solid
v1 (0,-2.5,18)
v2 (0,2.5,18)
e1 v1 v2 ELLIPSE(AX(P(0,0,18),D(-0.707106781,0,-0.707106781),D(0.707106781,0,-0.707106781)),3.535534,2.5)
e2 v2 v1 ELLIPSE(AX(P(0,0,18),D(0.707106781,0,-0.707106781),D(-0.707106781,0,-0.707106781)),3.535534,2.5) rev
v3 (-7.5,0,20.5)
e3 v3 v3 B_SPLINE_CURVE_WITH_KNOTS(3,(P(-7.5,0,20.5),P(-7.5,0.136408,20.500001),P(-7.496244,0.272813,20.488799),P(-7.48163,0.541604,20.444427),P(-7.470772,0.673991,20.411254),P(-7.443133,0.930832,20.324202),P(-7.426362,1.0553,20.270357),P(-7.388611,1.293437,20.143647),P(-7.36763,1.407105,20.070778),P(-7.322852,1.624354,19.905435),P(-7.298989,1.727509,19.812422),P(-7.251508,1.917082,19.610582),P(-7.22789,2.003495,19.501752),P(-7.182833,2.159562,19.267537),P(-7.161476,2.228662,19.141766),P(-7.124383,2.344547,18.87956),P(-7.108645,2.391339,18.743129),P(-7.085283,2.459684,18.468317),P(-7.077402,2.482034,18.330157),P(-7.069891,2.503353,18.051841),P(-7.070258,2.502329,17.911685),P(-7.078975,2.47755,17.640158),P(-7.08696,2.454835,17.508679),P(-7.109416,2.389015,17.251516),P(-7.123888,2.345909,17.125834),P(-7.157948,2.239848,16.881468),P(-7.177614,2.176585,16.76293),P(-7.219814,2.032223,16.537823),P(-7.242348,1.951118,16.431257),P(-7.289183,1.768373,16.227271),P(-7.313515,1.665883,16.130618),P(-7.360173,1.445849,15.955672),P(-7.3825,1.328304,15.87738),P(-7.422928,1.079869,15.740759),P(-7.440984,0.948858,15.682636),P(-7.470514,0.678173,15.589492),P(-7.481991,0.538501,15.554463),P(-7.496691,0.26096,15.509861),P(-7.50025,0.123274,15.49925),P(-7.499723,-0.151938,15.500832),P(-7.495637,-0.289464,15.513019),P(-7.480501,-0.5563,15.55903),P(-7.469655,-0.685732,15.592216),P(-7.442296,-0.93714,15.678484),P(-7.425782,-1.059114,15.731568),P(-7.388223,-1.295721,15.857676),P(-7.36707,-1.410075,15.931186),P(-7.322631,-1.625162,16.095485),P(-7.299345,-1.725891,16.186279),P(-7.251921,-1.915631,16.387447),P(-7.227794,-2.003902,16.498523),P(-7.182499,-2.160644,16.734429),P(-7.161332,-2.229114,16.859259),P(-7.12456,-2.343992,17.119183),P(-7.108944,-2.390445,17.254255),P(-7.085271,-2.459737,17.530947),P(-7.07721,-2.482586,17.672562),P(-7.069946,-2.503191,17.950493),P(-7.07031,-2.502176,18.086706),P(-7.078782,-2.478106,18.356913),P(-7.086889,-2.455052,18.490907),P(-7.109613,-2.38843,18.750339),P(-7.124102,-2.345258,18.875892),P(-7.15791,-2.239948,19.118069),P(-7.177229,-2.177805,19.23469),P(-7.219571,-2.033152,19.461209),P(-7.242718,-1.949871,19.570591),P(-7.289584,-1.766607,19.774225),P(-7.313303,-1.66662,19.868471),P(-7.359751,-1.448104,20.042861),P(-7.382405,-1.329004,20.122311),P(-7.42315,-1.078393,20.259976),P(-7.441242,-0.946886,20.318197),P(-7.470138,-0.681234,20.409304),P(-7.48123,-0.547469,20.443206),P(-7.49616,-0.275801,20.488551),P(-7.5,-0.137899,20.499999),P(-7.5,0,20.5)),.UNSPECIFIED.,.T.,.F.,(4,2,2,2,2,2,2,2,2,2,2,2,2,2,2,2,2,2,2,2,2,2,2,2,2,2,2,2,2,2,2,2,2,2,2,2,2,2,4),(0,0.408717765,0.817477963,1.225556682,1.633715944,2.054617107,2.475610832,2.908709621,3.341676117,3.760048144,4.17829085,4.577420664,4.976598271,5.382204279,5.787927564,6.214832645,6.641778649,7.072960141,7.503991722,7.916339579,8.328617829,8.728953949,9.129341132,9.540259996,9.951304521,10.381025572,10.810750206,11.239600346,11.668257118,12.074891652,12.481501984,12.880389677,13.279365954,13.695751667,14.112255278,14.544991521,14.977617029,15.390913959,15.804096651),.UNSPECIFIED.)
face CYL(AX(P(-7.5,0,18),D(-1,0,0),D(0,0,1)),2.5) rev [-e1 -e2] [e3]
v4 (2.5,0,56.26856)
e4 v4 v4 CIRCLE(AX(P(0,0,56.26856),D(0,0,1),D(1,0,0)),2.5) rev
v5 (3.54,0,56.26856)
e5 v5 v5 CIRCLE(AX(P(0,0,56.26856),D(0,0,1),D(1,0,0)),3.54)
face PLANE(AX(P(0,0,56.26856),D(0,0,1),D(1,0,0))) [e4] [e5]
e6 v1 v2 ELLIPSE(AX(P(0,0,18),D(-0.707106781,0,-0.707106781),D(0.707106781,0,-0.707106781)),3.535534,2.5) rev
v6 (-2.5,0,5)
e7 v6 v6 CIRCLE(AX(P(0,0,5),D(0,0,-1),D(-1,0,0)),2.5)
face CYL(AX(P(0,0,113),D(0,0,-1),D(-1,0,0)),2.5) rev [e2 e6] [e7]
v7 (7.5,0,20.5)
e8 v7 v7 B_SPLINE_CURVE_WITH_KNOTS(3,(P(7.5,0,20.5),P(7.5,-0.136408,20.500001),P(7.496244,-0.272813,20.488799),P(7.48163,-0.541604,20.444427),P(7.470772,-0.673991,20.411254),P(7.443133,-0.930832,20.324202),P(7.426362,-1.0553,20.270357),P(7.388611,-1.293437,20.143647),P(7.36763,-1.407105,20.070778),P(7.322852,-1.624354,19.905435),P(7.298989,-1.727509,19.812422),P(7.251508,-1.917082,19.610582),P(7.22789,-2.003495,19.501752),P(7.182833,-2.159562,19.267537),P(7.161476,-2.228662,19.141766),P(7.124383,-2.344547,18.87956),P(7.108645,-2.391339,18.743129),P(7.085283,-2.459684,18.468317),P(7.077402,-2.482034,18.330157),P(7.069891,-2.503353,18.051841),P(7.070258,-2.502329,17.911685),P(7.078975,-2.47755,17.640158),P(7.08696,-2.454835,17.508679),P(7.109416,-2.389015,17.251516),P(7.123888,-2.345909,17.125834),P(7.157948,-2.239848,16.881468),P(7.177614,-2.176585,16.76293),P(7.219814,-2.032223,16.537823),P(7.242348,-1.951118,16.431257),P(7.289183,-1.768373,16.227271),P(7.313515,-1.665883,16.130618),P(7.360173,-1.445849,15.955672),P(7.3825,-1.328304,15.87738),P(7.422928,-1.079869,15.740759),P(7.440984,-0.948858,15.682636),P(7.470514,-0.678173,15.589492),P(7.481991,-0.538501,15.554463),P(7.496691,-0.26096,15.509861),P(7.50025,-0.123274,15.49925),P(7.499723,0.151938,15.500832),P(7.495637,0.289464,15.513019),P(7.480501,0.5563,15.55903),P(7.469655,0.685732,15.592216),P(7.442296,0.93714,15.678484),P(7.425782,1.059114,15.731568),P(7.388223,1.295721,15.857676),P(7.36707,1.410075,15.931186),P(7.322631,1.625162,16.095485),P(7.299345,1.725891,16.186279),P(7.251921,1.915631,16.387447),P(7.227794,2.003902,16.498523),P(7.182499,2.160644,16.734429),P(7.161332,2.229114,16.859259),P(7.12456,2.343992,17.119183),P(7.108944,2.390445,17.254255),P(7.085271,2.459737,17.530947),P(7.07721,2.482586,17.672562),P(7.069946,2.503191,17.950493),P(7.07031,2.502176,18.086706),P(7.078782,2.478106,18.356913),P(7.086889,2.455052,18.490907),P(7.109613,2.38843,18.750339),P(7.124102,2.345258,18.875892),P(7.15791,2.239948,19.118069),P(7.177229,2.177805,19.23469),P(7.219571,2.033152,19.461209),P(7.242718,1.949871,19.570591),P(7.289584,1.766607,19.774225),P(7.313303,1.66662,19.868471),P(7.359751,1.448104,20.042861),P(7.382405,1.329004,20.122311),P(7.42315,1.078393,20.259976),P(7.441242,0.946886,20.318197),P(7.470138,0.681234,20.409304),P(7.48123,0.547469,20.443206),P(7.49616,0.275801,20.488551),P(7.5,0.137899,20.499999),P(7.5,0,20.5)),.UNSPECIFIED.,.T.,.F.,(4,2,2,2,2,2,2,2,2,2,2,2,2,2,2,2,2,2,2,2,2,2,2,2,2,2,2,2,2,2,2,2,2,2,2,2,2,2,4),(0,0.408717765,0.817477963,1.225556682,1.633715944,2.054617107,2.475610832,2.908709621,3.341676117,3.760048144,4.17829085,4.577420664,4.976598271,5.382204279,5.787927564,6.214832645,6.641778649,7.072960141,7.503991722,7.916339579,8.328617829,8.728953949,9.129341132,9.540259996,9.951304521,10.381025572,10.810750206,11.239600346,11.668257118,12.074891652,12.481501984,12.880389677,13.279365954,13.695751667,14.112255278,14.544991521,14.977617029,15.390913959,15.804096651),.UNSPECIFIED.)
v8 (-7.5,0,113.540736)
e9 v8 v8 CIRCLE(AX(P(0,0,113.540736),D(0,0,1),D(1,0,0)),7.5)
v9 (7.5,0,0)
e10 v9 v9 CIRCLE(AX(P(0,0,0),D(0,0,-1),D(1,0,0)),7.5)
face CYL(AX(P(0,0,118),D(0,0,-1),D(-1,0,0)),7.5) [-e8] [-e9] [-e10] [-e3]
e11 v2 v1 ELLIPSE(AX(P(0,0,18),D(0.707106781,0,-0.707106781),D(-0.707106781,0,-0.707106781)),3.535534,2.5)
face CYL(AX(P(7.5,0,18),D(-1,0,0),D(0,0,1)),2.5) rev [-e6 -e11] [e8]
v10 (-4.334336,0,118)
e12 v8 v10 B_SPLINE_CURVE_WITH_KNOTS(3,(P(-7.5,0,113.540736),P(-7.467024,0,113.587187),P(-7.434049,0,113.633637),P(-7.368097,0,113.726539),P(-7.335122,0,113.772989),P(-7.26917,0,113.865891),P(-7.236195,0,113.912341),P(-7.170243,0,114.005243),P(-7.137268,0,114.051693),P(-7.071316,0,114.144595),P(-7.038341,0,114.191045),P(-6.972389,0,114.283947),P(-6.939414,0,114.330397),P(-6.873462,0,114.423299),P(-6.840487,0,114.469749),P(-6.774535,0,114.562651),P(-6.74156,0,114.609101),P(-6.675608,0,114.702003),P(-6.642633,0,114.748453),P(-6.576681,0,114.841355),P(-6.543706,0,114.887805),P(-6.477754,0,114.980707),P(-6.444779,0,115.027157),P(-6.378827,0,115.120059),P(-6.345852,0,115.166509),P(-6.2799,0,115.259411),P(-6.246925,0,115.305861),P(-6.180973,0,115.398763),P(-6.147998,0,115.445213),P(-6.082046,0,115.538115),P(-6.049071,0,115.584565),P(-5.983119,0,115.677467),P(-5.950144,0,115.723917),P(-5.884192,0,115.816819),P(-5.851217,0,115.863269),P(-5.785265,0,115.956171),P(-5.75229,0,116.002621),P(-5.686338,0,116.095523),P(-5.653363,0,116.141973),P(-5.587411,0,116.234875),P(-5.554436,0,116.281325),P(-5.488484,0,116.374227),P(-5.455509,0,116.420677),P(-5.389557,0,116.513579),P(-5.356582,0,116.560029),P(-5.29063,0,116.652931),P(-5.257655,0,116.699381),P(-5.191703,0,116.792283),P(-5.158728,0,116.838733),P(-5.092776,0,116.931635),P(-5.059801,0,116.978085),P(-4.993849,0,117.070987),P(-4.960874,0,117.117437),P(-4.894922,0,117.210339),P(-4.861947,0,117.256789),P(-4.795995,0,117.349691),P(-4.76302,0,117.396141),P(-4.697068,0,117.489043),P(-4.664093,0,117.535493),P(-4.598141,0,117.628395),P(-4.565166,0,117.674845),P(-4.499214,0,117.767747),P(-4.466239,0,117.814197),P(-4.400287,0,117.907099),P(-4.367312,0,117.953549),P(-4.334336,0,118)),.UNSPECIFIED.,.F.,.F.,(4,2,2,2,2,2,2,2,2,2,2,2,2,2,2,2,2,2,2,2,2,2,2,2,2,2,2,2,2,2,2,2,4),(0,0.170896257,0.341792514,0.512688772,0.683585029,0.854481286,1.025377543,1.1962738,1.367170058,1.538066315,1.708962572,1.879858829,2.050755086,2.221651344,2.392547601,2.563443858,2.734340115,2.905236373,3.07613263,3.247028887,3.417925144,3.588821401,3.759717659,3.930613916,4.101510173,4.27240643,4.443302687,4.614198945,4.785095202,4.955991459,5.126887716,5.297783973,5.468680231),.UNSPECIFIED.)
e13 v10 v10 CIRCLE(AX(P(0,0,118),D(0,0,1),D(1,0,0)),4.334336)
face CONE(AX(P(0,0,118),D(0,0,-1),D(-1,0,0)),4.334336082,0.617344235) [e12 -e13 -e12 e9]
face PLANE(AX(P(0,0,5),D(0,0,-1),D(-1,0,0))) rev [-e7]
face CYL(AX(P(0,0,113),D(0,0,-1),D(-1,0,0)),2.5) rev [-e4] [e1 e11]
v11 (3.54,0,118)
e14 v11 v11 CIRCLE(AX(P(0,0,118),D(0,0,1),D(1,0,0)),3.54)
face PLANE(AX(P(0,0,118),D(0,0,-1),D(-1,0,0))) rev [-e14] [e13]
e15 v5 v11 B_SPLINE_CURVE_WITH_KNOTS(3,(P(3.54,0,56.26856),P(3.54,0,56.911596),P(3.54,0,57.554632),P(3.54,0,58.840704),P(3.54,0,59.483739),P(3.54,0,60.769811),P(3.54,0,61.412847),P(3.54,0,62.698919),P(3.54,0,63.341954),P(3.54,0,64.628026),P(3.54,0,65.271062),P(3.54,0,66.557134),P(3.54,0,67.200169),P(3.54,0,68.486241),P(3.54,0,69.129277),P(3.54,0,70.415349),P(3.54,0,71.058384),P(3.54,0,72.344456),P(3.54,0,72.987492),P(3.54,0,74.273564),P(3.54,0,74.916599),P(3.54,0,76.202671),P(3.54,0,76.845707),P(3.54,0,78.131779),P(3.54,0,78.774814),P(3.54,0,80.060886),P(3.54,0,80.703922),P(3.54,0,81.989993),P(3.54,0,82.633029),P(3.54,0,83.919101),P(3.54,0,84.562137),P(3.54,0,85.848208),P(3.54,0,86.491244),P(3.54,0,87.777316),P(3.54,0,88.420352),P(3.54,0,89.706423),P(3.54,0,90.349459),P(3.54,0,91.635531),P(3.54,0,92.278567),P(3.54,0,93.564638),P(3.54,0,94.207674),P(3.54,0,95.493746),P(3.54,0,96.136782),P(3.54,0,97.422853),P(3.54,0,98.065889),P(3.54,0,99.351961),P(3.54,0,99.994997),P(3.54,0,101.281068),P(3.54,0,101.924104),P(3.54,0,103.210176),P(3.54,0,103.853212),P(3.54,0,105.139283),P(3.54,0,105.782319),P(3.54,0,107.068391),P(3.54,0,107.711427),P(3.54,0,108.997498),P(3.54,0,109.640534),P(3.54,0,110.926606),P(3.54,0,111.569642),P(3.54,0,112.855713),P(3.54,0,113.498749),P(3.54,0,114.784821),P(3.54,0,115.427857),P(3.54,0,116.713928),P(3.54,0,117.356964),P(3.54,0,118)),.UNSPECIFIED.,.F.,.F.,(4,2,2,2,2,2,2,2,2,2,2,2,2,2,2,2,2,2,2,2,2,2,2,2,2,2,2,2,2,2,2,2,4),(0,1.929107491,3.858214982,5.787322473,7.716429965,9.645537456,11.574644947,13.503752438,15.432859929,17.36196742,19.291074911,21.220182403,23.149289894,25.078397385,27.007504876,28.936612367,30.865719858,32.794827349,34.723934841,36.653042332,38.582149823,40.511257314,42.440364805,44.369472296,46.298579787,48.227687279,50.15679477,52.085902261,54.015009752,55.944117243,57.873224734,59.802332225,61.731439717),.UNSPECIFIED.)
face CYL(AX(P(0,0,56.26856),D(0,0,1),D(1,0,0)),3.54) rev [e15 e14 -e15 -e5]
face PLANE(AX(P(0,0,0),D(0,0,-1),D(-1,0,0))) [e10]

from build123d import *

# Parameters (mm, degrees)
CROQUIS2_W                        = 2.5
CROQUIS2_H                        = 108
CROQUIS3_W                        = 7.5
CROQUIS3_H                        = 2.5
DI_METRO_DE_TALADRO_5_0_5_1_D     = 5
DI_METRO_DE_TALADRO_5_0_5_1_DEPTH = 15
CHAFL_N1_SIZE                     = 0.747946905
CHAFL_N1_SIZE2                    = 1.053583954
CROQUIS5_R                        = 3.54
CORTAR_EXTRUIR1_DEPTH             = 61.731439717


# Read off the part's stored shape, not the designer's step: Sólido importado2
with BuildPart() as part:
    # Croquis1 → Revolución1 (revolve)
    with BuildSketch(Plane.XZ):
        Polygon((4.334336082, 118), (0, 118), (0, 0), (7.5, 0), (7.5, 113.540736), align=None)
    revolve(axis=Axis((0, 0, 118), (0, 0, -1)))

    # Croquis2 → Cortar-Revolución1 (revolve, cut)
    with BuildSketch(Plane.XZ, mode=Mode.PRIVATE) as cortar_revoluci_n1_sk:
        with Locations((1.25, 59)):
            Rectangle(CROQUIS2_W, CROQUIS2_H)
    revolve(cortar_revoluci_n1_sk.sketch.rotate(Axis((0, 0, 113), (0, 0, -1)), 180), axis=Axis((0, 0, 113), (0, 0, -1)), mode=Mode.SUBTRACT)

    # Croquis3 → Cortar-Revolución2 (revolve, cut)
    with BuildSketch(Plane.XY.offset(18), mode=Mode.PRIVATE) as cortar_revoluci_n2_sk:
        with Locations((3.75, -1.25)):
            Rectangle(CROQUIS3_W, CROQUIS3_H)
    revolve(cortar_revoluci_n2_sk.sketch.rotate(Axis((7.5, 0, 18), (-1, 0, 0)), 90), axis=Axis((7.5, 0, 18), (-1, 0, 0)), mode=Mode.SUBTRACT)

    # Diámetro de taladro Ø5.0 (5)1
    with Locations(Plane(origin=(-7.5, 0, 18), x_dir=(0, 0, -1), z_dir=(-1, 0, 0))):
        with Locations((0, 0)):
            Hole(DI_METRO_DE_TALADRO_5_0_5_1_D / 2, depth=DI_METRO_DE_TALADRO_5_0_5_1_DEPTH)

    # Chaflán1
    chafl_n1_edges = [part.edges().sort_by_distance(p)[0] for p in [
        (2.5, 0, 113),
    ]]
    chafl_n1_side = [part.faces().sort_by_distance(p)[0] for p in [
        (0, 0, 113),
    ]]
    chamfer(chafl_n1_edges, length=CHAFL_N1_SIZE, length2=CHAFL_N1_SIZE2, reference=chafl_n1_side[0])

    # Croquis5 → Cortar-Extruir1 (cut)
    with BuildSketch(Plane.XY.offset(118)):
        Circle(CROQUIS5_R)
    extrude(amount=-CORTAR_EXTRUIR1_DEPTH, mode=Mode.SUBTRACT)


solid = part.part
